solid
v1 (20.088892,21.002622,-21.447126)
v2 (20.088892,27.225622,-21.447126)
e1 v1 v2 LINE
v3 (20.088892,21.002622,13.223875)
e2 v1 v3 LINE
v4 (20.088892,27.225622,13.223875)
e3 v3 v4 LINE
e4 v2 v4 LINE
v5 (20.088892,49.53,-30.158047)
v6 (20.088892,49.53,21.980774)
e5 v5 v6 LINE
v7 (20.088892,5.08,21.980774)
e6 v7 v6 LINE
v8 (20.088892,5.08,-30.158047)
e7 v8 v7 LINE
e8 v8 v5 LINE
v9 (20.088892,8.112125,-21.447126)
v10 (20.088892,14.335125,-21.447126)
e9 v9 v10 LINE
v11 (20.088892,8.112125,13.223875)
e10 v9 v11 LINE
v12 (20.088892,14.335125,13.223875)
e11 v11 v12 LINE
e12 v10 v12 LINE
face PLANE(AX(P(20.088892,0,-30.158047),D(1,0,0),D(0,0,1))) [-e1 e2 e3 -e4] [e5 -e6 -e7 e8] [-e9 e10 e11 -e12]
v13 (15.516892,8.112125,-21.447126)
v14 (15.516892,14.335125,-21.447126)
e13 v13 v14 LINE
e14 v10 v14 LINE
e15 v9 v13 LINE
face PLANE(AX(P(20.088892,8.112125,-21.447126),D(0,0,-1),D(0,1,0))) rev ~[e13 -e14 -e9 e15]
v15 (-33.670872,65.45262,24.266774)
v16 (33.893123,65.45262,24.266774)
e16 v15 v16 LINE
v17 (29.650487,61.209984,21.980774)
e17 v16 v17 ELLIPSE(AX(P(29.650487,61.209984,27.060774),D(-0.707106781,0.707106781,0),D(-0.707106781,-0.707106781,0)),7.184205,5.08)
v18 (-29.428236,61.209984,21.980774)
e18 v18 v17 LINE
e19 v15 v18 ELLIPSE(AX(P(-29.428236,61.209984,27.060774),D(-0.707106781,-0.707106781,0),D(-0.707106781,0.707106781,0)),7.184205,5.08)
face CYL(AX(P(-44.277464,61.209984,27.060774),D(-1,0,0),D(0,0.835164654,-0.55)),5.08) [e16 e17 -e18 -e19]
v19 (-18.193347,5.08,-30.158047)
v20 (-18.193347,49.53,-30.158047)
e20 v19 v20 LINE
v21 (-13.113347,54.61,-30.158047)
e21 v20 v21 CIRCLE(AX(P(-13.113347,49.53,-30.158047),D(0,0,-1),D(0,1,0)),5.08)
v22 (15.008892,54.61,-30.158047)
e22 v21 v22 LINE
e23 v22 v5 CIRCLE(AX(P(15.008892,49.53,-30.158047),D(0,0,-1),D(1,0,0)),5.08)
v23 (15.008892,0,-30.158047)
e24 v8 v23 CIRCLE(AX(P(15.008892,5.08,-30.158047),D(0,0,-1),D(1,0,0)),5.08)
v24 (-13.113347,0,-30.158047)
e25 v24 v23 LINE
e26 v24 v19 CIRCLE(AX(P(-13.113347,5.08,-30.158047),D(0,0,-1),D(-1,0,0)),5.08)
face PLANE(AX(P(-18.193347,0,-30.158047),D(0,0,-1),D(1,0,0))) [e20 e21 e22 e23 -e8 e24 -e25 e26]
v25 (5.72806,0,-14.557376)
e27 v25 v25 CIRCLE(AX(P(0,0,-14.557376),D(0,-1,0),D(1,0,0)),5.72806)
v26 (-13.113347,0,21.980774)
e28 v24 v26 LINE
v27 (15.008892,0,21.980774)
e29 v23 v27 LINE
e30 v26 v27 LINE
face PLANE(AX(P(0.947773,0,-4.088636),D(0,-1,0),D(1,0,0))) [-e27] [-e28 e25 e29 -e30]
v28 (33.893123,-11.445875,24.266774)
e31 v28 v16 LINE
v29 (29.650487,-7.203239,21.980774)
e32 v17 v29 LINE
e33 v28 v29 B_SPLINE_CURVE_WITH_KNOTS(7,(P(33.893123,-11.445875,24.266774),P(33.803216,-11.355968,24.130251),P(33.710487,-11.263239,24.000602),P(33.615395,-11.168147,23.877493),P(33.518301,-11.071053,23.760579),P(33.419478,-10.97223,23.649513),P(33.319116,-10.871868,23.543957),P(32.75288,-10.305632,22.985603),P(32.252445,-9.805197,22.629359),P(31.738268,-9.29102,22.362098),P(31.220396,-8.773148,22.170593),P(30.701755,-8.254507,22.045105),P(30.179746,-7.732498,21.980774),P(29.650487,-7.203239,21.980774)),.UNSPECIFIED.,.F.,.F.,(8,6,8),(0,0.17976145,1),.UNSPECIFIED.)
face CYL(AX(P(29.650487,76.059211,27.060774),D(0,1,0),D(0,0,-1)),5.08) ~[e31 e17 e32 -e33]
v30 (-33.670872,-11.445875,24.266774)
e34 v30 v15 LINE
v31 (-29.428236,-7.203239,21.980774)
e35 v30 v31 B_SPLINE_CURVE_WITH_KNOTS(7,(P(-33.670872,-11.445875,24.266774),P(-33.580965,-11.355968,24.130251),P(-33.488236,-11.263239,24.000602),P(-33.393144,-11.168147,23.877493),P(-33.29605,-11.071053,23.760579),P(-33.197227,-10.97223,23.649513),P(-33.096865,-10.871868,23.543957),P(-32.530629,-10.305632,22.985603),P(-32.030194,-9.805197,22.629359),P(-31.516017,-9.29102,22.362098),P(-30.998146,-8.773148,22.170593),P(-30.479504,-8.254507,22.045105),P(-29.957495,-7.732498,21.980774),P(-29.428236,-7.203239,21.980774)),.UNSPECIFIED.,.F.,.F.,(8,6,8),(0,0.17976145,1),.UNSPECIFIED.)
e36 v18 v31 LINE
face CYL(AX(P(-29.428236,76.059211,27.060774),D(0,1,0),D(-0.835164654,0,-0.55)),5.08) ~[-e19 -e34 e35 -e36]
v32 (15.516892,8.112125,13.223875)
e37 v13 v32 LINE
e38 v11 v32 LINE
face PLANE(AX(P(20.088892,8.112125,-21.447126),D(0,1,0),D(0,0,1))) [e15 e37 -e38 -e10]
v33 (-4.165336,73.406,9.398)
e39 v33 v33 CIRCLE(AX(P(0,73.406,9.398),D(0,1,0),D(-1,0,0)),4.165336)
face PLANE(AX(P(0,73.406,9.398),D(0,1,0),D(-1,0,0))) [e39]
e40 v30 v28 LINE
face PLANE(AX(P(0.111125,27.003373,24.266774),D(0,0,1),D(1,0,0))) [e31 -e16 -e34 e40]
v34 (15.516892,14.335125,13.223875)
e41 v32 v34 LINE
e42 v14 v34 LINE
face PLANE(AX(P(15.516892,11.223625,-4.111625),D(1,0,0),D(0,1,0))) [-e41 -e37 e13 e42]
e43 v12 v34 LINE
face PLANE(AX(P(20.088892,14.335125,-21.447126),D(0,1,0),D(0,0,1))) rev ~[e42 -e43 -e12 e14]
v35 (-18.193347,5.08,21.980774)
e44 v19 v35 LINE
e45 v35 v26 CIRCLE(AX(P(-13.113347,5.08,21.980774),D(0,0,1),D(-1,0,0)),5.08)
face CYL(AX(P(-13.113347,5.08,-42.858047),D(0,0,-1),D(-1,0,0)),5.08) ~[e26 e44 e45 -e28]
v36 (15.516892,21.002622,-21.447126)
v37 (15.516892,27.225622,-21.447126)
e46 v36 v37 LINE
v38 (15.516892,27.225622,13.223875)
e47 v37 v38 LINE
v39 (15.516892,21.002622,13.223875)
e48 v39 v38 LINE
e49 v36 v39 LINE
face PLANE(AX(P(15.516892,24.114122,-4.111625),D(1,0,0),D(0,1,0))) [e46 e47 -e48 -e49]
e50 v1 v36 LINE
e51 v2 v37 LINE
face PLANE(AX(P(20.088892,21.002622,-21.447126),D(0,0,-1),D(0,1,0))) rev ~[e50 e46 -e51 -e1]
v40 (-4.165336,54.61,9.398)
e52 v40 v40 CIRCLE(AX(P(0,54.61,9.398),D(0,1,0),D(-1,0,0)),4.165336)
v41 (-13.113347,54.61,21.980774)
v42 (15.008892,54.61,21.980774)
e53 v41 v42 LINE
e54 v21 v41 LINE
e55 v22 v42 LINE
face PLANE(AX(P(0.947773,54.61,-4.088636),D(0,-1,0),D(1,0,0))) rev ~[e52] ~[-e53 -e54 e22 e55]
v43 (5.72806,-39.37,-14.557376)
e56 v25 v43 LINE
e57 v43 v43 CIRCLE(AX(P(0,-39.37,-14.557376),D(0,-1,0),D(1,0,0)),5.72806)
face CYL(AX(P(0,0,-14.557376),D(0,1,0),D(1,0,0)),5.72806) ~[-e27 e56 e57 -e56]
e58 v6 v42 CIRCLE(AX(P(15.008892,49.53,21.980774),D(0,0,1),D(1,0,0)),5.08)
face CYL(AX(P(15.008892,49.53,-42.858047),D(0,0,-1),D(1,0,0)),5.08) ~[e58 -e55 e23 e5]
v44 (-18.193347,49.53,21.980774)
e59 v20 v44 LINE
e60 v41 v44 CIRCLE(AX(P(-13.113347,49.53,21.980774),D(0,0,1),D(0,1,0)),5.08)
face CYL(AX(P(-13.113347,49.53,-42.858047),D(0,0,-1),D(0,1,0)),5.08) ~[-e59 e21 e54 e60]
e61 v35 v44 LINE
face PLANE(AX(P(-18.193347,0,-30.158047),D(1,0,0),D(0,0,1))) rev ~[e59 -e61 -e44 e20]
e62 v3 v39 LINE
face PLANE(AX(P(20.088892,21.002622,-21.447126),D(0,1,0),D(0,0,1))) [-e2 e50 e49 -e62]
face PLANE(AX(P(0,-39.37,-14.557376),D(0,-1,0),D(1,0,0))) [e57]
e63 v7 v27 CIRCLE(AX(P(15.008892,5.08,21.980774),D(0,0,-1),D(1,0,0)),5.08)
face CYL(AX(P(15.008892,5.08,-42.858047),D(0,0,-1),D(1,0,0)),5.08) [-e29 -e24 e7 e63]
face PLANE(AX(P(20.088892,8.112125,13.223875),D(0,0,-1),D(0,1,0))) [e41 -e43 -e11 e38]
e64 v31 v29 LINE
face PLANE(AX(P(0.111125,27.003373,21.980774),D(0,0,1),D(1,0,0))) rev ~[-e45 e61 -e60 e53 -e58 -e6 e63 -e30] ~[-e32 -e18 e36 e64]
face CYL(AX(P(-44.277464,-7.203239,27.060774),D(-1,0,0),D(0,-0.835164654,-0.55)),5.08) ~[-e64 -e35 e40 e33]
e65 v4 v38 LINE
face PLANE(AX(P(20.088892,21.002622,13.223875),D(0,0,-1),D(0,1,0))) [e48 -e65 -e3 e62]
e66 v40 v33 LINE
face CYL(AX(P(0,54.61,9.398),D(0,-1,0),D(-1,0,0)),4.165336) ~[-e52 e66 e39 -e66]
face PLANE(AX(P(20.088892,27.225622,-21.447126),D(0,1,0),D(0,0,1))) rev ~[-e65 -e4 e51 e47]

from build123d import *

# Parameters (mm, degrees)
F0_W         = 38.2822398096
F0_H         = 52.1388202906
F1_DEPTH     = 54.61
F2_R         = 5.728059517
F3_DEPTH     = 39.37
F4_W         = 6.2229996547
F4_H         = 34.6710011363
F5_DEPTH     = 4.572
F6_R         = 4.1653363511
F7_DEPTH     = 18.796
F8_W         = 67.563995719
F8_H         = 76.8984956667
F9_DEPTH     = 2.286
F10_T1_DEPTH = 64.8388202906
F10_T3_DEPTH = 88.7771779414
F10_T5_DEPTH = 98.1116778891


# Not quite as in the source:
# - a fillet or chamfer that OpenCascade refuses, or shapes differently, is made with other operations: its cross-section is extruded or revolved along the edge and cut away or added


with BuildPart() as f1:
    # F0 (on Front) → F1 (new body)
    with BuildSketch(Plane.XZ):
        with Locations((0.9477725253, -4.0886364877)):
            Rectangle(F0_W, F0_H)
    extrude(amount=-F1_DEPTH)

    # F2 (on Front) → F3 (join)
    with BuildSketch(Plane.XZ):
        with Locations((0, -14.5573755726)):
            Circle(F2_R)
    extrude(amount=F3_DEPTH)

    # F4 (on face) → F5 (cut)
    with BuildSketch(Plane.YZ.offset(20.0888924301)):
        with Locations((11.2236249261, -4.1116252542)):
            Rectangle(F4_W, F4_H)
        with Locations((24.1141221486, -4.1116252542)):
            Rectangle(F4_W, F4_H)
    extrude(amount=-F5_DEPTH, mode=Mode.SUBTRACT)

    # F6 (on face) → F7 (join)
    with BuildSketch(Plane(origin=(0, 54.61, 0), x_dir=(-1, 0, 0), z_dir=(0, 1, 0))):
        with Locations((0, 9.3980003148)):
            Circle(F6_R)
    extrude(amount=F7_DEPTH)

    # F8 (on face) → F9 (join)
    with BuildSketch(Plane.XY.offset(21.9807736576)):
        with Locations((0.1111254096, 27.0033725537)):
            Rectangle(F8_W, F8_H)
    extrude(amount=F9_DEPTH)

    # F10: fillet of radius 5.08 on 8 edges, made by hand

    # F10_s2 → F10_t1 (cut)
    with BuildSketch(Plane.XY.offset(-42.858046633)):
        with BuildLine():
            ThreePointArc((20.0888924301, 5.08), (18.6009948785, 1.4878975516), (15.0088924301, 0))
            Line((15.0088924301, 0), (20.0888924301, 0))
            Line((20.0888924301, 0), (20.0888924301, 5.08))
        make_face()
        with BuildLine():
            ThreePointArc((-18.1933473796, 5.08), (-16.705449828, 1.4878975516), (-13.1133473796, 0))
            Line((-13.1133473796, 0), (-18.1933473796, 0))
            Line((-18.1933473796, 0), (-18.1933473796, 5.08))
        make_face()
        with BuildLine():
            ThreePointArc((-13.1133473796, 54.61), (-16.705449828, 53.1221024484), (-18.1933473796, 49.53))
            Line((-18.1933473796, 49.53), (-18.1933473796, 54.61))
            Line((-18.1933473796, 54.61), (-13.1133473796, 54.61))
        make_face()
        with BuildLine():
            ThreePointArc((20.0888924301, 49.53), (18.6009948785, 53.1221024484), (15.0088924301, 54.61))
            Line((15.0088924301, 54.61), (20.0888924301, 54.61))
            Line((20.0888924301, 54.61), (20.0888924301, 49.53))
        make_face()
    extrude(amount=F10_T1_DEPTH, mode=Mode.SUBTRACT)

    # F10_s4 → F10_t3 (cut)
    with BuildSketch(Plane.YZ.offset(-44.2774635611)):
        with BuildLine():
            ThreePointArc((65.4526203871, 24.2667736576), (63.6196395196, 22.5886421747), (61.2099839426, 21.9807736576))
            Line((61.2099839426, 21.9807736576), (65.4526203871, 21.9807736576))
            Line((65.4526203871, 21.9807736576), (65.4526203871, 24.2667736576))
        make_face()
        with BuildLine():
            ThreePointArc((-11.4458752796, 24.2667736576), (-9.6128944122, 22.5886421747), (-7.2032388351, 21.9807736576))
            Line((-7.2032388351, 21.9807736576), (-11.4458752796, 21.9807736576))
            Line((-11.4458752796, 21.9807736576), (-11.4458752796, 24.2667736576))
        make_face()
    extrude(amount=F10_T3_DEPTH, mode=Mode.SUBTRACT)

    # F10_s6 → F10_t5 (cut)
    with BuildSketch(Plane.XZ.offset(-76.0592114983)):
        with BuildLine():
            ThreePointArc((29.6504868246, 21.9807736576), (32.0601424016, 22.5886421747), (33.8931232691, 24.2667736576))
            Line((33.8931232691, 24.2667736576), (33.8931232691, 21.9807736576))
            Line((33.8931232691, 21.9807736576), (29.6504868246, 21.9807736576))
        make_face()
        with BuildLine():
            ThreePointArc((-33.6708724499, 24.2667736576), (-31.8378915824, 22.5886421747), (-29.4282360054, 21.9807736576))
            Line((-29.4282360054, 21.9807736576), (-33.6708724499, 21.9807736576))
            Line((-33.6708724499, 21.9807736576), (-33.6708724499, 24.2667736576))
        make_face()
    extrude(amount=F10_T5_DEPTH, mode=Mode.SUBTRACT)


solid = f1.part
